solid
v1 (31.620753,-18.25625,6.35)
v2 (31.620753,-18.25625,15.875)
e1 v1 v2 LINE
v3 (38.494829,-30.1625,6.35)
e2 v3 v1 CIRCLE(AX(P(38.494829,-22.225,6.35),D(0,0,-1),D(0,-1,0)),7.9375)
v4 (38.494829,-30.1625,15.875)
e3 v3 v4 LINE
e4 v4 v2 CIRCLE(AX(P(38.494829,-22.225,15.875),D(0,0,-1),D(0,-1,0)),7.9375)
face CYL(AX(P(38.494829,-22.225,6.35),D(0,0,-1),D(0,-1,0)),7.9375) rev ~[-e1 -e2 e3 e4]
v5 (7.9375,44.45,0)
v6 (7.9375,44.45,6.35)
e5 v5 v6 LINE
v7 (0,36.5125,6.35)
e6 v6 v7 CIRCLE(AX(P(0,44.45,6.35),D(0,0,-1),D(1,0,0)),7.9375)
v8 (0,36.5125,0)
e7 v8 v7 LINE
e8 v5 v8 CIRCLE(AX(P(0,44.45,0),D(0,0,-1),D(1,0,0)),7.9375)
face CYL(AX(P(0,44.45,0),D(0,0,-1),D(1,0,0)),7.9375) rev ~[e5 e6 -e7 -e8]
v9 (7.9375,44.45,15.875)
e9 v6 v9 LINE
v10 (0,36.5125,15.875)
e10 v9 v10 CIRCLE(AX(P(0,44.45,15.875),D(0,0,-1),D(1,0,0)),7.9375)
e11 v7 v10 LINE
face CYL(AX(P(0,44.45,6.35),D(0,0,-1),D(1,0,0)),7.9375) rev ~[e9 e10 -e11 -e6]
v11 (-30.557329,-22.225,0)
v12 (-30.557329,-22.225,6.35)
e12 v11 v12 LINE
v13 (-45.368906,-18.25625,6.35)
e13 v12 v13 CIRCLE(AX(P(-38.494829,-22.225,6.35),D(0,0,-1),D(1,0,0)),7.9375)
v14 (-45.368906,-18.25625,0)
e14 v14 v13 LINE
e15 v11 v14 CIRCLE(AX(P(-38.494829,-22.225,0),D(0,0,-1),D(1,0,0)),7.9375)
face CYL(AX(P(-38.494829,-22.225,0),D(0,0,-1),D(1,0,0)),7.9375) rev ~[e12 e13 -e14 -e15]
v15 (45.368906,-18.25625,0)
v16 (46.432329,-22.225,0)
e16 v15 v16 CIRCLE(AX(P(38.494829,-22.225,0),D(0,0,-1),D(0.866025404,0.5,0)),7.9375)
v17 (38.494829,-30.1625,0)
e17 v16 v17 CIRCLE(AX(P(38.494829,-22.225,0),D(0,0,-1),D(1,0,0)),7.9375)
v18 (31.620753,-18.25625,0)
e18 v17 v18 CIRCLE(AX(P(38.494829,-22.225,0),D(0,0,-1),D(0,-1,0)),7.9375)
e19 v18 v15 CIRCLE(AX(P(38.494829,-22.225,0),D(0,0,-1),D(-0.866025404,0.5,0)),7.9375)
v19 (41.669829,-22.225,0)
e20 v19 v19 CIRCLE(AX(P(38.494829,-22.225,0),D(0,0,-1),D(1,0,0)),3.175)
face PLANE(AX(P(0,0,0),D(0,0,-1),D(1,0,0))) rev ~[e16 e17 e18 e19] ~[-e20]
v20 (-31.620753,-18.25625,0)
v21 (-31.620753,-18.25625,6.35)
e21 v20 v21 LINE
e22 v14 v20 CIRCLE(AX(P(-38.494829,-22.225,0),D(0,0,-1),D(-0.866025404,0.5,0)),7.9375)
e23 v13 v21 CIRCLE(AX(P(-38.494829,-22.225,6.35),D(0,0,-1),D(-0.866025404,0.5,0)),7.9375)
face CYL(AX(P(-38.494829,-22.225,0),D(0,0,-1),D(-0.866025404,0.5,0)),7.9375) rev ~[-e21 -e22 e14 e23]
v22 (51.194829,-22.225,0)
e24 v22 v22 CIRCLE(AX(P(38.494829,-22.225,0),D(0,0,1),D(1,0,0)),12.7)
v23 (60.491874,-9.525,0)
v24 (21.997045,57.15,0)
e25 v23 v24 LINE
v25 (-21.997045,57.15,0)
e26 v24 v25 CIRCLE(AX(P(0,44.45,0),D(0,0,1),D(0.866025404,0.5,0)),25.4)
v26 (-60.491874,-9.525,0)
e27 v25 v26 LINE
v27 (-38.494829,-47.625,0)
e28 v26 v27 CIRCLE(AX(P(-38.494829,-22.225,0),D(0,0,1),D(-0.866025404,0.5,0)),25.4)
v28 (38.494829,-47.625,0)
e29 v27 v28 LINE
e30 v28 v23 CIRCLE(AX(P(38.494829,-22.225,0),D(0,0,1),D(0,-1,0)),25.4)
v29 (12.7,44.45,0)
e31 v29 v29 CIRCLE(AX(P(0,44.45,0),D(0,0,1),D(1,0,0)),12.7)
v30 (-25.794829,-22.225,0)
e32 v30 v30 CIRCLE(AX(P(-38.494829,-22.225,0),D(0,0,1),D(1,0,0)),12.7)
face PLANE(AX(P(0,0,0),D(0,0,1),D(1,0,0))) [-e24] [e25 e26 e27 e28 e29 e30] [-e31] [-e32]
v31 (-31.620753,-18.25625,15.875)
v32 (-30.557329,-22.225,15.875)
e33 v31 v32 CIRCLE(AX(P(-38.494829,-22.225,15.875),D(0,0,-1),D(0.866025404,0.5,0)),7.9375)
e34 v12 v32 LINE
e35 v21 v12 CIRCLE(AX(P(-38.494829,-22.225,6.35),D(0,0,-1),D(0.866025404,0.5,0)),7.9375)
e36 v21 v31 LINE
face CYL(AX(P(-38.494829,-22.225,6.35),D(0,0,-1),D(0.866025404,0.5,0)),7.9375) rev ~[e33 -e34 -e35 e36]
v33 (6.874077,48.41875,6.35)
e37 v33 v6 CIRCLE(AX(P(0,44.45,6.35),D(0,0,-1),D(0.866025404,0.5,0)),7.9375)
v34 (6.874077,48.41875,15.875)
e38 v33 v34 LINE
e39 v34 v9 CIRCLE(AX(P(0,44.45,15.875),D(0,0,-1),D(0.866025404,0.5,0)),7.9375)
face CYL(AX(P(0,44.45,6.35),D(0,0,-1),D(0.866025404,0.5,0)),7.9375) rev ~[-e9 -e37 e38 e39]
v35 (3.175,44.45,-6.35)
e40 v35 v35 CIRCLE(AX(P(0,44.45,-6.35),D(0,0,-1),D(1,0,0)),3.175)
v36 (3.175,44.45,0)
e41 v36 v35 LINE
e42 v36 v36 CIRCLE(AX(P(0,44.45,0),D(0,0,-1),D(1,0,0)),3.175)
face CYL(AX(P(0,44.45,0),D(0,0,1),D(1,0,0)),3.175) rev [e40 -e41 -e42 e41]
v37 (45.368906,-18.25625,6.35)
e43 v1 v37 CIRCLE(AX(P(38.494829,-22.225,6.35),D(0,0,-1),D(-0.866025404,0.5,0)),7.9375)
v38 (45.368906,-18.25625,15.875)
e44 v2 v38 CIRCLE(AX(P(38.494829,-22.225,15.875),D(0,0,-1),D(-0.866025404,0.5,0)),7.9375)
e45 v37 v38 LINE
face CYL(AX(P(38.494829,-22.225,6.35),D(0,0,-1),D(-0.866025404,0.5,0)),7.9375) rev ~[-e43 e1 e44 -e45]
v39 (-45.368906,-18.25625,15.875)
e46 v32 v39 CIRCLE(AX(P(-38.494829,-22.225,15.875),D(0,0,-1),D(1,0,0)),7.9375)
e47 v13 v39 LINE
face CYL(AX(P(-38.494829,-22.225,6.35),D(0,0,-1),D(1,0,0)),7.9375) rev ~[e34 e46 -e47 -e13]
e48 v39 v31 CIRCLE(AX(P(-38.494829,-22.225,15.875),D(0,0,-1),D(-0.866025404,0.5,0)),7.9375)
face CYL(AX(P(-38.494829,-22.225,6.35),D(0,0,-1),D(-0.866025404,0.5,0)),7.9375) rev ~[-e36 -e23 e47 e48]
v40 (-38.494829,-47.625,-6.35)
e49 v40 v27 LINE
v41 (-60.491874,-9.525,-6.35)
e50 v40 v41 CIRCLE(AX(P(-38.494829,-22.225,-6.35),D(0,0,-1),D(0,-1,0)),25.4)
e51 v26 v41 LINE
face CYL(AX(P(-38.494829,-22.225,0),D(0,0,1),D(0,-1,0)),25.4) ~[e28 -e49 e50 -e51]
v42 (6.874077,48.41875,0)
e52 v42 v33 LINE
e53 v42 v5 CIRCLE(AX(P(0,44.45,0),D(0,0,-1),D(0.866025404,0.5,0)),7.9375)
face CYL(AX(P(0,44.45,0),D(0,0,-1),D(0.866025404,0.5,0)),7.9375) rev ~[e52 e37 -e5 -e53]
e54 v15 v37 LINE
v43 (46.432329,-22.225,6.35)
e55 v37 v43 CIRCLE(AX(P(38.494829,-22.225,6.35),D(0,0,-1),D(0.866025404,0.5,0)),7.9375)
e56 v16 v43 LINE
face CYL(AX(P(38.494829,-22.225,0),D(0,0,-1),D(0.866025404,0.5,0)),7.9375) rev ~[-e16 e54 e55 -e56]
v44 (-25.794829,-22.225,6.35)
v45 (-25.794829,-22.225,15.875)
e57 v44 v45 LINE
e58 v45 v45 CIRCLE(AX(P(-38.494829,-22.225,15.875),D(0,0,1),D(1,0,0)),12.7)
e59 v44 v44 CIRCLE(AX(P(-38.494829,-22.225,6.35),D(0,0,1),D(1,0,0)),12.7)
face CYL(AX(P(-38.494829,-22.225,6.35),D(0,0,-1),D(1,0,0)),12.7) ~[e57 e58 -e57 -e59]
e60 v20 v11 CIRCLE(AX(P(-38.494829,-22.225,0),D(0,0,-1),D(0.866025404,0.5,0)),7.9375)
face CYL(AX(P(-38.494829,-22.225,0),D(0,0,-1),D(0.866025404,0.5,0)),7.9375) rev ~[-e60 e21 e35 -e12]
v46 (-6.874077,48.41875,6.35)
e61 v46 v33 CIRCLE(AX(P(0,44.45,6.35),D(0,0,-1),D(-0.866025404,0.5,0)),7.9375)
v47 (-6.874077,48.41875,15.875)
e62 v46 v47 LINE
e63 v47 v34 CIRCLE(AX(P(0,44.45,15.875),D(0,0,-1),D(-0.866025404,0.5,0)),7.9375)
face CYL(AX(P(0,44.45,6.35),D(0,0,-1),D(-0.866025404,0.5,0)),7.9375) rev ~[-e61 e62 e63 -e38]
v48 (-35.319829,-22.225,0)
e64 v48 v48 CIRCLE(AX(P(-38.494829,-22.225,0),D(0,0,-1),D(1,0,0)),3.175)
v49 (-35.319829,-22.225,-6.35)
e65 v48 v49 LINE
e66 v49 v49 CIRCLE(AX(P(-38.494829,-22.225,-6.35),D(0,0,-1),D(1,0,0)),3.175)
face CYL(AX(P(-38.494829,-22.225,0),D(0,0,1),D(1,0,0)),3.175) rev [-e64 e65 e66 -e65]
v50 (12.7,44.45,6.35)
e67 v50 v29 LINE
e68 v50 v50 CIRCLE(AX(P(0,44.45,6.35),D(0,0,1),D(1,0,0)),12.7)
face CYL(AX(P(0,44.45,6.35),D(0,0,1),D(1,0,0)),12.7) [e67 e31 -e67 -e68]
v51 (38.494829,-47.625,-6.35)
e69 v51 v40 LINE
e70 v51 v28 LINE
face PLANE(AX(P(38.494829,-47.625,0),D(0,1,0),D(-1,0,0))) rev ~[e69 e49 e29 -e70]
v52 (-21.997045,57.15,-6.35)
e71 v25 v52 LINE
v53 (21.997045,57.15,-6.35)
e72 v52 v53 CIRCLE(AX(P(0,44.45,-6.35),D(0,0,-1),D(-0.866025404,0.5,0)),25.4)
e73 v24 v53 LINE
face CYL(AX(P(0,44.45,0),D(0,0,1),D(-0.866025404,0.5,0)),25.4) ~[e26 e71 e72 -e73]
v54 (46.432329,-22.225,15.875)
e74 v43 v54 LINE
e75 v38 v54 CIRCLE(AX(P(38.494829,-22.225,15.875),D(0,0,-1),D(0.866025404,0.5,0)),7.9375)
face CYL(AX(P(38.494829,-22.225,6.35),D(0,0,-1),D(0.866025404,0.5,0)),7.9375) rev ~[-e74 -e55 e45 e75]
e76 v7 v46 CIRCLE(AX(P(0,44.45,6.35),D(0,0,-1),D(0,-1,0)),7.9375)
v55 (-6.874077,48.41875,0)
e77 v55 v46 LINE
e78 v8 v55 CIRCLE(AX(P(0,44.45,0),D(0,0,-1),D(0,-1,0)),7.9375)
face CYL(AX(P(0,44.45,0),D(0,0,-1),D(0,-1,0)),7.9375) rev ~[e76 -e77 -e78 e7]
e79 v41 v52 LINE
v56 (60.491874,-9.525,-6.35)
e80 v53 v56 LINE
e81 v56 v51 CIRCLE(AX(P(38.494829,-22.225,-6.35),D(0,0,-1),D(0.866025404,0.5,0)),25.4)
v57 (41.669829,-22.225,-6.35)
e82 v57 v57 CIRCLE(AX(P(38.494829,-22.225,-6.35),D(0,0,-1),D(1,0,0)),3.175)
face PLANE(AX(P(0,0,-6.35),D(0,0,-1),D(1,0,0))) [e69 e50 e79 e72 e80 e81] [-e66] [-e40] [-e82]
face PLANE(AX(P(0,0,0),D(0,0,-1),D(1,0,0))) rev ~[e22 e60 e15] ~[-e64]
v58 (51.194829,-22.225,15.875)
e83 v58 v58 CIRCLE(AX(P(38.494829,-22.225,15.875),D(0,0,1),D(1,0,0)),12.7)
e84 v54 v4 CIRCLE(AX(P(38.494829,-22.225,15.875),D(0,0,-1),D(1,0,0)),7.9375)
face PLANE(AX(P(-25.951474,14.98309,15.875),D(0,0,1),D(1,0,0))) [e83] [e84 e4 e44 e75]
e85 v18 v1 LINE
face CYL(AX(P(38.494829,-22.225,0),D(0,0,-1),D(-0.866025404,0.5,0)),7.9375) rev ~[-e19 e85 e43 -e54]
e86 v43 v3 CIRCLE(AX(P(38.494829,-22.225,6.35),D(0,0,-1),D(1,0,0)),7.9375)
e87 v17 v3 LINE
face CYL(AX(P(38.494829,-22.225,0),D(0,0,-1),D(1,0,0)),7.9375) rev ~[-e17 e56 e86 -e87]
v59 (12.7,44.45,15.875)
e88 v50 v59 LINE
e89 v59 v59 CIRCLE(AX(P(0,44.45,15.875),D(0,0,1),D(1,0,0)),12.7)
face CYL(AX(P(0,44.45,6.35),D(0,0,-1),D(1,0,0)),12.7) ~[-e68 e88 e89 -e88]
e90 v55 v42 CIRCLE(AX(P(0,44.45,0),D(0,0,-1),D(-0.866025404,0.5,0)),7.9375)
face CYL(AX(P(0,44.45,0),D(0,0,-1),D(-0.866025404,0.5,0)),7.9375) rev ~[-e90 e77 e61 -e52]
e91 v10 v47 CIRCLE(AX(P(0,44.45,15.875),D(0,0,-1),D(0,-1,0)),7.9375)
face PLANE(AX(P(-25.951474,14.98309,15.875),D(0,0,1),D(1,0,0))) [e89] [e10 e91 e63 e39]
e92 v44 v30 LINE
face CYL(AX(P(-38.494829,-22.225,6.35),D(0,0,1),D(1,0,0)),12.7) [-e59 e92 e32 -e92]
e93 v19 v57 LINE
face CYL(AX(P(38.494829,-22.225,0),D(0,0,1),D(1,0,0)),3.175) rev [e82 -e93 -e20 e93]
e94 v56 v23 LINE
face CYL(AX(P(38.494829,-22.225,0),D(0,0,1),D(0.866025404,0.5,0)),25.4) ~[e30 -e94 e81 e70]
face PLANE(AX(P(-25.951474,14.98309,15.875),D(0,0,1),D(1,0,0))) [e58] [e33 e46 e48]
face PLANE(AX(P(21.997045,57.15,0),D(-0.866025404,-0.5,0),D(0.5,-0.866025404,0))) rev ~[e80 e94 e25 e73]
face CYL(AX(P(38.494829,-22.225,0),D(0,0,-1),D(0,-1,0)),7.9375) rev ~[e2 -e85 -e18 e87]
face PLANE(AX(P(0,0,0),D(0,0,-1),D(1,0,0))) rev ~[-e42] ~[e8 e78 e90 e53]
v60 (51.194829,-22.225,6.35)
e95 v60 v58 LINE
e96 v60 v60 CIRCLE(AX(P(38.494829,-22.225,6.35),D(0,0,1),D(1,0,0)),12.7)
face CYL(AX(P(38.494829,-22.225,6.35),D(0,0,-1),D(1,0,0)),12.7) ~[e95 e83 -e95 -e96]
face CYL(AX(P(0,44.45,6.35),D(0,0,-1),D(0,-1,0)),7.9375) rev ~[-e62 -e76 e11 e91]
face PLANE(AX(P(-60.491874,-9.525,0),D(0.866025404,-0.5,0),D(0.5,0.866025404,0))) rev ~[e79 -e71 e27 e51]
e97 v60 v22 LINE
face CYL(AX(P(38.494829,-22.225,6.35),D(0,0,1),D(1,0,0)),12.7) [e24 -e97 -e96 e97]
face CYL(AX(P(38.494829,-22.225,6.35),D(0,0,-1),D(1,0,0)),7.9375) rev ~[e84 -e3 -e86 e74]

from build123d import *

# Parameters (mm, degrees)
F1_DEPTH = 6.35
F2_R     = 7.9375
F2_R_2   = 3.175
F3_DEPTH = 6.35
F4_R     = 12.7
F5_DEPTH = 6.35
F6_DEPTH = 9.525


with BuildPart() as f1:
    # F0 (on Top) → F1 (new body)
    with BuildSketch(Plane.XY):
        with BuildLine():
            Line((-31.6207525557, -18.25625), (0, 0))
            Line((0, 0), (0, 36.5125))
            ThreePointArc((0, 36.5125), (-6.8740766425, 40.48125), (-6.8740766425, 48.41875))
            Line((-6.8740766425, 48.41875), (-21.9970452561, 57.15))
            Line((-21.9970452561, 57.15), (-60.4918744543, -9.525))
            Line((-60.4918744543, -9.525), (-45.3689058408, -18.25625))
            ThreePointArc((-45.3689058408, -18.25625), (-38.4948291982, -14.2875), (-31.6207525557, -18.25625))
        make_face()
        with BuildLine():
            ThreePointArc((-38.4948291982, -30.1625), (-45.3689058408, -26.19375), (-45.3689058408, -18.25625))
            Line((-45.3689058408, -18.25625), (-60.4918744543, -9.525))
            ThreePointArc((-60.4918744543, -9.525), (-60.4918744543, -34.925), (-38.4948291982, -47.625))
            Line((-38.4948291982, -47.625), (-38.4948291982, -30.1625))
        make_face()
        with BuildLine():
            Line((31.6207525557, -18.25625), (0, 0))
            Line((0, 0), (-31.6207525557, -18.25625))
            ThreePointArc((-31.6207525557, -18.25625), (-30.827792952, -20.1706238295), (-30.5573291982, -22.225))
            ThreePointArc((-30.5573291982, -22.225), (-32.8821691226, -27.8376600757), (-38.4948291982, -30.1625))
            Line((-38.4948291982, -30.1625), (-38.4948291982, -47.625))
            Line((-38.4948291982, -47.625), (38.4948291982, -47.625))
            Line((38.4948291982, -47.625), (38.4948291982, -30.1625))
            ThreePointArc((38.4948291982, -30.1625), (31.6207525557, -26.19375), (31.6207525557, -18.25625))
        make_face()
        with BuildLine():
            Line((60.4918744543, -9.525), (45.3689058408, -18.25625))
            ThreePointArc((45.3689058408, -18.25625), (46.1618654444, -20.1706238295), (46.4323291982, -22.225))
            ThreePointArc((46.4323291982, -22.225), (44.1074892739, -27.8376600757), (38.4948291982, -30.1625))
            Line((38.4948291982, -30.1625), (38.4948291982, -47.625))
            ThreePointArc((38.4948291982, -47.625), (60.4918744543, -34.925), (60.4918744543, -9.525))
        make_face()
        with BuildLine():
            Line((0, 36.5125), (0, 0))
            Line((0, 0), (31.6207525557, -18.25625))
            ThreePointArc((31.6207525557, -18.25625), (38.4948291982, -14.2875), (45.3689058408, -18.25625))
            Line((45.3689058408, -18.25625), (60.4918744543, -9.525))
            Line((60.4918744543, -9.525), (21.9970452561, 57.15))
            Line((21.9970452561, 57.15), (6.8740766425, 48.41875))
            ThreePointArc((6.8740766425, 48.41875), (7.6670362462, 46.5043761705), (7.9375, 44.45))
            ThreePointArc((7.9375, 44.45), (5.6126600757, 38.8373399243), (0, 36.5125))
        make_face()
        with BuildLine():
            Line((-21.9970452561, 57.15), (-6.8740766425, 48.41875))
            ThreePointArc((-6.8740766425, 48.41875), (0, 52.3875), (6.8740766425, 48.41875))
            Line((6.8740766425, 48.41875), (21.9970452561, 57.15))
            ThreePointArc((21.9970452561, 57.15), (0, 69.85), (-21.9970452561, 57.15))
        make_face()
    extrude(amount=F1_DEPTH)

    # F2 (on face) → F3 (join)
    with BuildSketch(Plane(origin=(0, 0, 0), x_dir=(1, 0, 0), z_dir=(0, 0, -1))):
        with BuildLine():
            ThreePointArc((-38.4948291982, 47.625), (-60.4918744543, 34.925), (-60.4918744543, 9.525))
            Line((-60.4918744543, 9.525), (-21.9970452561, -57.15))
            ThreePointArc((-21.9970452561, -57.15), (0, -69.85), (21.9970452561, -57.15))
            Line((21.9970452561, -57.15), (60.4918744543, 9.525))
            ThreePointArc((60.4918744543, 9.525), (60.4918744543, 34.925), (38.4948291982, 47.625))
            Line((38.4948291982, 47.625), (-38.4948291982, 47.625))
        make_face()
        with Locations((0, -44.45)):
            Circle(F2_R, mode=Mode.SUBTRACT)
        with Locations((-38.4948291982, 22.225)):
            Circle(F2_R, mode=Mode.SUBTRACT)
        with Locations((38.4948291982, 22.225)):
            Circle(F2_R, mode=Mode.SUBTRACT)
        with Locations((0, -44.45)):
            Circle(F2_R)
        with Locations((0, -44.45)):
            Circle(F2_R_2, mode=Mode.SUBTRACT)
        with Locations((38.4948291982, 22.225)):
            Circle(F2_R)
        with Locations((38.4948291982, 22.225)):
            Circle(F2_R_2, mode=Mode.SUBTRACT)
        with Locations((-38.4948291982, 22.225)):
            Circle(F2_R)
        with Locations((-38.4948291982, 22.225)):
            Circle(F2_R_2, mode=Mode.SUBTRACT)
    extrude(amount=F3_DEPTH)

    # F4 (on face) → F5 (cut)
    with BuildSketch(Plane.XY.offset(6.35)):
        with BuildLine():
            ThreePointArc((21.9970452561, 57.15), (0, 69.85), (-21.9970452561, 57.15))
            Line((-21.9970452561, 57.15), (-60.4918744543, -9.525))
            ThreePointArc((-60.4918744543, -9.525), (-60.4918744543, -34.925), (-38.4948291982, -47.625))
            Line((-38.4948291982, -47.625), (38.4948291982, -47.625))
            ThreePointArc((38.4948291982, -47.625), (60.4918744543, -34.925), (60.4918744543, -9.525))
            Line((60.4918744543, -9.525), (21.9970452561, 57.15))
        make_face()
        with Locations((-38.4948291982, -22.225)):
            Circle(F4_R, mode=Mode.SUBTRACT)
        with Locations((38.4948291982, -22.225)):
            Circle(F4_R, mode=Mode.SUBTRACT)
        with Locations((0, 44.45)):
            Circle(F4_R, mode=Mode.SUBTRACT)
    extrude(amount=-F5_DEPTH, mode=Mode.SUBTRACT)

    # F6 (add): faces of the model
    f6_faces = [f1.faces().sort_by_distance(p)[0] for p in [
        (-50.8356189534, -22.225, 6.35),
        (-12.3407897552, 44.45, 6.35),
        (26.1540394431, -22.225, 6.35),
    ]]
    extrude(f6_faces, amount=F6_DEPTH)


solid = f1.part
